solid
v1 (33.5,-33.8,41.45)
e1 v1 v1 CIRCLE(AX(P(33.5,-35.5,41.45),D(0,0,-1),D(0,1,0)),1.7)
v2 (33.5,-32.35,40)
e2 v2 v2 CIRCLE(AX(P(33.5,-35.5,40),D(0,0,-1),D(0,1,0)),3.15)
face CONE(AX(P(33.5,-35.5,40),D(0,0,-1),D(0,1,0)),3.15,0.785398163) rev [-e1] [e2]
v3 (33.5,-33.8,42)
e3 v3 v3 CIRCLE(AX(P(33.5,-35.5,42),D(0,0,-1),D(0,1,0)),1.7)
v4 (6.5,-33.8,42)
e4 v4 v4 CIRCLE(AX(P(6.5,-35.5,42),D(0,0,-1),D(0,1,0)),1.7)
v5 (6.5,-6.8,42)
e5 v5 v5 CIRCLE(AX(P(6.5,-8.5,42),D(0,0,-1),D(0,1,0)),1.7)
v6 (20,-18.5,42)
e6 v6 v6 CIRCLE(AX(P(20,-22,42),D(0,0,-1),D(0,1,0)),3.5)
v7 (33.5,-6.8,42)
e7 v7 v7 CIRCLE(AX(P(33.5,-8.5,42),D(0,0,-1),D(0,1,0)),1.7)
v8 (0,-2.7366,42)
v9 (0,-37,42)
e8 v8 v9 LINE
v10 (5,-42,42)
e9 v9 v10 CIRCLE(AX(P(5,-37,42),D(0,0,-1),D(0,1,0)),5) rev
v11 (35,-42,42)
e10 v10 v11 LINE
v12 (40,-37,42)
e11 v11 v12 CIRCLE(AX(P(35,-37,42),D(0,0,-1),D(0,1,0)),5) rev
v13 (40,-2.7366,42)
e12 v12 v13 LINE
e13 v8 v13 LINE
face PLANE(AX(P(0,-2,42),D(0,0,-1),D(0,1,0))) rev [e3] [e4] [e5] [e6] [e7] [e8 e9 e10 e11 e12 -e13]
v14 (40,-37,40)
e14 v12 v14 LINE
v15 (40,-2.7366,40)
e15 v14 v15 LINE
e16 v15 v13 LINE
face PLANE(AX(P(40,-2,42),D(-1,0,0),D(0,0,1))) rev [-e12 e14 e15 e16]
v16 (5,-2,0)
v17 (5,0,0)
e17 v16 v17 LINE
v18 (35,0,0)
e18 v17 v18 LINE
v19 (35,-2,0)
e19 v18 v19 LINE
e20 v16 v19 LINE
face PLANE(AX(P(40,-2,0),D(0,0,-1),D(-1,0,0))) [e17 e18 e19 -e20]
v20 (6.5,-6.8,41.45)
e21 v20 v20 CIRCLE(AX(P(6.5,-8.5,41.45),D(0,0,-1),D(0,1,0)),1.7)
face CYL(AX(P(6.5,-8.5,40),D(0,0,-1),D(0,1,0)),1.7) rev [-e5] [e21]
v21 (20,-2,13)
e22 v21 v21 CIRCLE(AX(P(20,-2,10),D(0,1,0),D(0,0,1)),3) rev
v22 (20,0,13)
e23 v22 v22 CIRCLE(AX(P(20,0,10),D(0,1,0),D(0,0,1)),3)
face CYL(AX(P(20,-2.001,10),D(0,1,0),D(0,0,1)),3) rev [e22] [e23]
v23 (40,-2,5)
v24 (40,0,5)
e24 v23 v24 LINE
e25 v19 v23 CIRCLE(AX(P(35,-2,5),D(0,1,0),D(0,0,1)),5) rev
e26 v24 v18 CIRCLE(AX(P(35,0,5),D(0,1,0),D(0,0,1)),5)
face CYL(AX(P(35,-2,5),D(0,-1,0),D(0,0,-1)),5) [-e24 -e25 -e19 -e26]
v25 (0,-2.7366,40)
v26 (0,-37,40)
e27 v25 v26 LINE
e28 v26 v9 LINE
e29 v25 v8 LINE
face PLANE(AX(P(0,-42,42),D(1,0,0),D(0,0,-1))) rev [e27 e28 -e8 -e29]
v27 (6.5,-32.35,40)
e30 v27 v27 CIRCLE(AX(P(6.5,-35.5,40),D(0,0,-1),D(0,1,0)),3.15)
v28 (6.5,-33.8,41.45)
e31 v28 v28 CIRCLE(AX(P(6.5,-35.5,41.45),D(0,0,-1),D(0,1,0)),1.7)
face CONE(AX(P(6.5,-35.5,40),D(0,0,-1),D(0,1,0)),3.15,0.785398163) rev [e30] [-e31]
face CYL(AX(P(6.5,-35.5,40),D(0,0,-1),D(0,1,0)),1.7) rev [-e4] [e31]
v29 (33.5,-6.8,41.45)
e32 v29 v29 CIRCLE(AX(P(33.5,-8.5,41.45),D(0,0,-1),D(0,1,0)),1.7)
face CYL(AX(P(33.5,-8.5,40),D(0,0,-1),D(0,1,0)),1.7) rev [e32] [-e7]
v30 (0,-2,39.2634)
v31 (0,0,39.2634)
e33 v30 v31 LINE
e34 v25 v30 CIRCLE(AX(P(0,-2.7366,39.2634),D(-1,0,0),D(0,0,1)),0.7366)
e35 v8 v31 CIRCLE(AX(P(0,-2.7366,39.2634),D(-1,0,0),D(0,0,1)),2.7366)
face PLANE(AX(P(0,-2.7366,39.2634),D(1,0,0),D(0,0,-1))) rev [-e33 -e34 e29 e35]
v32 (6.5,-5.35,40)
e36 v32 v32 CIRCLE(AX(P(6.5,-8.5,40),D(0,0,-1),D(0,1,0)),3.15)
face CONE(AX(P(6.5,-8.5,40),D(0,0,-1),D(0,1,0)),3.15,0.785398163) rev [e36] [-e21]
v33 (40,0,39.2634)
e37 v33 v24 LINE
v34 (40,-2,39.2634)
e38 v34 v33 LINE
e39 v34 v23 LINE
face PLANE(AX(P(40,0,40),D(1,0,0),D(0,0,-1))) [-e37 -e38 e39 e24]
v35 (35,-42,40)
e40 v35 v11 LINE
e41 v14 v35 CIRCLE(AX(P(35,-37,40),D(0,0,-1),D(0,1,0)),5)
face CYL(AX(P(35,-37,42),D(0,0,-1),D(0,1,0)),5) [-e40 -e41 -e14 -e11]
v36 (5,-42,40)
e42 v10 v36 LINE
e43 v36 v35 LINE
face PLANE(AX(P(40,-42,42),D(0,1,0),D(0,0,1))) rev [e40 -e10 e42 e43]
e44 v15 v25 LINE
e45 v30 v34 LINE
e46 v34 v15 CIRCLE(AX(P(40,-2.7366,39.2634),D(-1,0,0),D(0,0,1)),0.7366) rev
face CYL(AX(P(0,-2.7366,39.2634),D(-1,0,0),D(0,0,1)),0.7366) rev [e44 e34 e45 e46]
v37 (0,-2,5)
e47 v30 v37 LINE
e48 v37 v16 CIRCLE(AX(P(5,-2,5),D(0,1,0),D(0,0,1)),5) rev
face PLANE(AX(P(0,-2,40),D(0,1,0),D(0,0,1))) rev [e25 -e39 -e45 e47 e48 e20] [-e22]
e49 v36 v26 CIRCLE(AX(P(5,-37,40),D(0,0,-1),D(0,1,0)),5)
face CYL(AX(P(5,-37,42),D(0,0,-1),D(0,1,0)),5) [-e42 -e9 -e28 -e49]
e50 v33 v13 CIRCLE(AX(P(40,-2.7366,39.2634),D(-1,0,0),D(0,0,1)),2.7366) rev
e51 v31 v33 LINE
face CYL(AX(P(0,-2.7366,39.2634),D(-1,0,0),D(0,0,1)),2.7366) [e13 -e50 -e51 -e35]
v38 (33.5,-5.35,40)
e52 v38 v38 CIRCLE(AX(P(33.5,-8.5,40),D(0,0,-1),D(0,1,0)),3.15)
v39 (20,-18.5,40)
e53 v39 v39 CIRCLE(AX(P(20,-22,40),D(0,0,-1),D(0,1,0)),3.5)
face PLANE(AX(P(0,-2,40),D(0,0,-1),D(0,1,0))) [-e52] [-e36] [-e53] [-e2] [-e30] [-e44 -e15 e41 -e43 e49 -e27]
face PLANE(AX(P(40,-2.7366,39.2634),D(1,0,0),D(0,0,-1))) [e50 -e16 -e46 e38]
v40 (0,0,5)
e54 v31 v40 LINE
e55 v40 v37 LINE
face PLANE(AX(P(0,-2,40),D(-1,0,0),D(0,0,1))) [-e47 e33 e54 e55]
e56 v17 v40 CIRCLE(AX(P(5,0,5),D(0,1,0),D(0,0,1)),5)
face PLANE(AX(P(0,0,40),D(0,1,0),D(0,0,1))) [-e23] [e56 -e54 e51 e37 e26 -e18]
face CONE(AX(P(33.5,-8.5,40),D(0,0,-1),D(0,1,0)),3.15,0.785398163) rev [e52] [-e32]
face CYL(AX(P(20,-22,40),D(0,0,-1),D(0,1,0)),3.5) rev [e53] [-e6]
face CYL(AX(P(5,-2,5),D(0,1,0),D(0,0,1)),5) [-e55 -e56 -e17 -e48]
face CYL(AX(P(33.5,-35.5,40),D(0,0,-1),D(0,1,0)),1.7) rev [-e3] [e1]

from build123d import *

# Parameters (mm, degrees)
SKETCH_1_W                       = 40
SKETCH_1_H                       = 2
SM_BASE_FLANGE_1_DEPTH           = 40
CUT_EXTRUDE_1_REACH              = 58.604
SKETCH_3_R                       = 3
SM_EDGE_FLANGE_1_STRIP_W         = 9.4732
SM_EDGE_FLANGE_1_STRIP_H         = 2
SM_EDGE_FLANGE_1_STRIP_CUT_DEPTH = 40
SM_EDGE_FLANGE_1_DEPTH           = 40
FILLET_1_R                       = 5
HOLE_WIZARD_M3_1_AT_2_COUNT      = 2
HOLE_WIZARD_M3_1_AT_2_PITCH      = 27
HOLE_WIZARD_M3_1_AT_3_COUNT      = 2
HOLE_WIZARD_M3_1_AT_3_PITCH      = 38.183766184
HOLE_WIZARD_M3_1_AT_4_COUNT      = 2
HOLE_WIZARD_M3_1_AT_4_PITCH      = 27
HOLE_WIZARD_7_0_7_1_D            = 7
HOLE_WIZARD_7_0_7_1_DEPTH        = 2
HOLE_WIZARD_7_0_7_1_TIP          = 2.103012167


# Sheet-metal steps are written as plain solids
with BuildPart() as part:
    # Sketch 1 → 基材-凸緣1 (new body)
    with BuildSketch(Plane.XY):
        with Locations((20, -1)):
            Rectangle(SKETCH_1_W, SKETCH_1_H)
    extrude(amount=SM_BASE_FLANGE_1_DEPTH)

    # 草圖3 → 除料-伸長1 (cut, up to next)
    with BuildSketch(Plane(origin=(0, 0, 0), x_dir=(-1, 0, 0), z_dir=(0, 1, 0)), mode=Mode.PRIVATE) as cut_extrude_1_sk1:
        with Locations(Location((-20, 10, 0), (0, 0, 90))):
            Circle(SKETCH_3_R)
    cut_extrude_1_tool1 = extrude(cut_extrude_1_sk1.sketch, amount=-CUT_EXTRUDE_1_REACH, mode=Mode.PRIVATE) & part.part
    add(cut_extrude_1_tool1.solids().sort_by_distance((20, 0, 10))[0], mode=Mode.SUBTRACT)

    # 邊線-凸緣1 strip (across the edge) → 邊線-凸緣1 strip cut (cut)
    with BuildSketch(Plane(origin=(40, -2, 40), x_dir=(0, 0, -1), z_dir=(-1, 0, 0))):
        with Locations((-4, -1)):
            Rectangle(SM_EDGE_FLANGE_1_STRIP_W, SM_EDGE_FLANGE_1_STRIP_H)
    extrude(amount=SM_EDGE_FLANGE_1_STRIP_CUT_DEPTH, mode=Mode.SUBTRACT)

    # 邊線-凸緣1 section (across the edge) → 邊線-凸緣1 (add)
    with BuildSketch(Plane(origin=(40, -2, 40), x_dir=(0, 0, -1), z_dir=(-1, 0, 0))):
        with BuildLine():
            Line((-2, 0.7366), (-2, 40))
            Line((-2, 40), (0, 40))
            Line((0, 40), (0, 0.7366))
            ThreePointArc((0, 0.7366), (0.215745145, 0.215745145), (0.7366, 0))
            Line((0.7366, 0), (0.7366, -2))
            ThreePointArc((0.7366, -2), (-1.198468417, -1.198468417), (-2, 0.7366))
        make_face()
    extrude(amount=SM_EDGE_FLANGE_1_DEPTH)

    # 圓角1
    fillet_1_edges = [part.edges().sort_by_distance(p)[0] for p in [
        (0, -1, 0),
        (40, -42, 41),
        (0, -42, 41),
        (40, -1, 0),
    ]]
    fillet(fillet_1_edges, radius=FILLET_1_R)

    # 草圖7 → M3 平錐坑頭螺釘的錐孔1 (revolve, cut)
    with BuildSketch(Plane(origin=(33.5, -35.5, 40), x_dir=(0, 1, 0), z_dir=(1, 0, 0))):
        Polygon((0, 0), (0, 2), (1.7, 2), (1.7, 1.45), (3.15, 0), align=None)
    hole_wizard_m3_1 = revolve(axis=Axis((33.5, -35.5, 33.65), (0, 0, 1)), mode=Mode.SUBTRACT)

    # M3 平錐坑頭螺釘的錐孔1 at 2: M3 平錐坑頭螺釘的錐孔1 ×2
    with Locations(*[(0, i * HOLE_WIZARD_M3_1_AT_2_PITCH, 0) for i in range(1, HOLE_WIZARD_M3_1_AT_2_COUNT)]):
        add(hole_wizard_m3_1, mode=Mode.SUBTRACT)

    # M3 平錐坑頭螺釘的錐孔1 at 3: M3 平錐坑頭螺釘的錐孔1 ×2
    with Locations(*[Vector(-0.7071067811865475, 0.7071067811865477, -2.465626675858965e-15) * (i * HOLE_WIZARD_M3_1_AT_3_PITCH) for i in range(1, HOLE_WIZARD_M3_1_AT_3_COUNT)]):
        add(hole_wizard_m3_1, mode=Mode.SUBTRACT)

    # M3 平錐坑頭螺釘的錐孔1 at 4: M3 平錐坑頭螺釘的錐孔1 ×2
    with Locations(*[(-i * HOLE_WIZARD_M3_1_AT_4_PITCH, 0, 0) for i in range(1, HOLE_WIZARD_M3_1_AT_4_COUNT)]):
        add(hole_wizard_m3_1, mode=Mode.SUBTRACT)

    # Ø7.0 (7) 直徑孔1
    with Locations(Plane(origin=(0, 0, 40), x_dir=(-1, 0, 0), z_dir=(0, 0, -1))):
        with Locations((-20, -22)):
            Hole(HOLE_WIZARD_7_0_7_1_D / 2, depth=HOLE_WIZARD_7_0_7_1_DEPTH)
            with Locations((0, 0, -(HOLE_WIZARD_7_0_7_1_DEPTH + HOLE_WIZARD_7_0_7_1_TIP / 2))):  # 118° drill point
                Cone(0, HOLE_WIZARD_7_0_7_1_D / 2, HOLE_WIZARD_7_0_7_1_TIP, mode=Mode.SUBTRACT)


solid = part.part
